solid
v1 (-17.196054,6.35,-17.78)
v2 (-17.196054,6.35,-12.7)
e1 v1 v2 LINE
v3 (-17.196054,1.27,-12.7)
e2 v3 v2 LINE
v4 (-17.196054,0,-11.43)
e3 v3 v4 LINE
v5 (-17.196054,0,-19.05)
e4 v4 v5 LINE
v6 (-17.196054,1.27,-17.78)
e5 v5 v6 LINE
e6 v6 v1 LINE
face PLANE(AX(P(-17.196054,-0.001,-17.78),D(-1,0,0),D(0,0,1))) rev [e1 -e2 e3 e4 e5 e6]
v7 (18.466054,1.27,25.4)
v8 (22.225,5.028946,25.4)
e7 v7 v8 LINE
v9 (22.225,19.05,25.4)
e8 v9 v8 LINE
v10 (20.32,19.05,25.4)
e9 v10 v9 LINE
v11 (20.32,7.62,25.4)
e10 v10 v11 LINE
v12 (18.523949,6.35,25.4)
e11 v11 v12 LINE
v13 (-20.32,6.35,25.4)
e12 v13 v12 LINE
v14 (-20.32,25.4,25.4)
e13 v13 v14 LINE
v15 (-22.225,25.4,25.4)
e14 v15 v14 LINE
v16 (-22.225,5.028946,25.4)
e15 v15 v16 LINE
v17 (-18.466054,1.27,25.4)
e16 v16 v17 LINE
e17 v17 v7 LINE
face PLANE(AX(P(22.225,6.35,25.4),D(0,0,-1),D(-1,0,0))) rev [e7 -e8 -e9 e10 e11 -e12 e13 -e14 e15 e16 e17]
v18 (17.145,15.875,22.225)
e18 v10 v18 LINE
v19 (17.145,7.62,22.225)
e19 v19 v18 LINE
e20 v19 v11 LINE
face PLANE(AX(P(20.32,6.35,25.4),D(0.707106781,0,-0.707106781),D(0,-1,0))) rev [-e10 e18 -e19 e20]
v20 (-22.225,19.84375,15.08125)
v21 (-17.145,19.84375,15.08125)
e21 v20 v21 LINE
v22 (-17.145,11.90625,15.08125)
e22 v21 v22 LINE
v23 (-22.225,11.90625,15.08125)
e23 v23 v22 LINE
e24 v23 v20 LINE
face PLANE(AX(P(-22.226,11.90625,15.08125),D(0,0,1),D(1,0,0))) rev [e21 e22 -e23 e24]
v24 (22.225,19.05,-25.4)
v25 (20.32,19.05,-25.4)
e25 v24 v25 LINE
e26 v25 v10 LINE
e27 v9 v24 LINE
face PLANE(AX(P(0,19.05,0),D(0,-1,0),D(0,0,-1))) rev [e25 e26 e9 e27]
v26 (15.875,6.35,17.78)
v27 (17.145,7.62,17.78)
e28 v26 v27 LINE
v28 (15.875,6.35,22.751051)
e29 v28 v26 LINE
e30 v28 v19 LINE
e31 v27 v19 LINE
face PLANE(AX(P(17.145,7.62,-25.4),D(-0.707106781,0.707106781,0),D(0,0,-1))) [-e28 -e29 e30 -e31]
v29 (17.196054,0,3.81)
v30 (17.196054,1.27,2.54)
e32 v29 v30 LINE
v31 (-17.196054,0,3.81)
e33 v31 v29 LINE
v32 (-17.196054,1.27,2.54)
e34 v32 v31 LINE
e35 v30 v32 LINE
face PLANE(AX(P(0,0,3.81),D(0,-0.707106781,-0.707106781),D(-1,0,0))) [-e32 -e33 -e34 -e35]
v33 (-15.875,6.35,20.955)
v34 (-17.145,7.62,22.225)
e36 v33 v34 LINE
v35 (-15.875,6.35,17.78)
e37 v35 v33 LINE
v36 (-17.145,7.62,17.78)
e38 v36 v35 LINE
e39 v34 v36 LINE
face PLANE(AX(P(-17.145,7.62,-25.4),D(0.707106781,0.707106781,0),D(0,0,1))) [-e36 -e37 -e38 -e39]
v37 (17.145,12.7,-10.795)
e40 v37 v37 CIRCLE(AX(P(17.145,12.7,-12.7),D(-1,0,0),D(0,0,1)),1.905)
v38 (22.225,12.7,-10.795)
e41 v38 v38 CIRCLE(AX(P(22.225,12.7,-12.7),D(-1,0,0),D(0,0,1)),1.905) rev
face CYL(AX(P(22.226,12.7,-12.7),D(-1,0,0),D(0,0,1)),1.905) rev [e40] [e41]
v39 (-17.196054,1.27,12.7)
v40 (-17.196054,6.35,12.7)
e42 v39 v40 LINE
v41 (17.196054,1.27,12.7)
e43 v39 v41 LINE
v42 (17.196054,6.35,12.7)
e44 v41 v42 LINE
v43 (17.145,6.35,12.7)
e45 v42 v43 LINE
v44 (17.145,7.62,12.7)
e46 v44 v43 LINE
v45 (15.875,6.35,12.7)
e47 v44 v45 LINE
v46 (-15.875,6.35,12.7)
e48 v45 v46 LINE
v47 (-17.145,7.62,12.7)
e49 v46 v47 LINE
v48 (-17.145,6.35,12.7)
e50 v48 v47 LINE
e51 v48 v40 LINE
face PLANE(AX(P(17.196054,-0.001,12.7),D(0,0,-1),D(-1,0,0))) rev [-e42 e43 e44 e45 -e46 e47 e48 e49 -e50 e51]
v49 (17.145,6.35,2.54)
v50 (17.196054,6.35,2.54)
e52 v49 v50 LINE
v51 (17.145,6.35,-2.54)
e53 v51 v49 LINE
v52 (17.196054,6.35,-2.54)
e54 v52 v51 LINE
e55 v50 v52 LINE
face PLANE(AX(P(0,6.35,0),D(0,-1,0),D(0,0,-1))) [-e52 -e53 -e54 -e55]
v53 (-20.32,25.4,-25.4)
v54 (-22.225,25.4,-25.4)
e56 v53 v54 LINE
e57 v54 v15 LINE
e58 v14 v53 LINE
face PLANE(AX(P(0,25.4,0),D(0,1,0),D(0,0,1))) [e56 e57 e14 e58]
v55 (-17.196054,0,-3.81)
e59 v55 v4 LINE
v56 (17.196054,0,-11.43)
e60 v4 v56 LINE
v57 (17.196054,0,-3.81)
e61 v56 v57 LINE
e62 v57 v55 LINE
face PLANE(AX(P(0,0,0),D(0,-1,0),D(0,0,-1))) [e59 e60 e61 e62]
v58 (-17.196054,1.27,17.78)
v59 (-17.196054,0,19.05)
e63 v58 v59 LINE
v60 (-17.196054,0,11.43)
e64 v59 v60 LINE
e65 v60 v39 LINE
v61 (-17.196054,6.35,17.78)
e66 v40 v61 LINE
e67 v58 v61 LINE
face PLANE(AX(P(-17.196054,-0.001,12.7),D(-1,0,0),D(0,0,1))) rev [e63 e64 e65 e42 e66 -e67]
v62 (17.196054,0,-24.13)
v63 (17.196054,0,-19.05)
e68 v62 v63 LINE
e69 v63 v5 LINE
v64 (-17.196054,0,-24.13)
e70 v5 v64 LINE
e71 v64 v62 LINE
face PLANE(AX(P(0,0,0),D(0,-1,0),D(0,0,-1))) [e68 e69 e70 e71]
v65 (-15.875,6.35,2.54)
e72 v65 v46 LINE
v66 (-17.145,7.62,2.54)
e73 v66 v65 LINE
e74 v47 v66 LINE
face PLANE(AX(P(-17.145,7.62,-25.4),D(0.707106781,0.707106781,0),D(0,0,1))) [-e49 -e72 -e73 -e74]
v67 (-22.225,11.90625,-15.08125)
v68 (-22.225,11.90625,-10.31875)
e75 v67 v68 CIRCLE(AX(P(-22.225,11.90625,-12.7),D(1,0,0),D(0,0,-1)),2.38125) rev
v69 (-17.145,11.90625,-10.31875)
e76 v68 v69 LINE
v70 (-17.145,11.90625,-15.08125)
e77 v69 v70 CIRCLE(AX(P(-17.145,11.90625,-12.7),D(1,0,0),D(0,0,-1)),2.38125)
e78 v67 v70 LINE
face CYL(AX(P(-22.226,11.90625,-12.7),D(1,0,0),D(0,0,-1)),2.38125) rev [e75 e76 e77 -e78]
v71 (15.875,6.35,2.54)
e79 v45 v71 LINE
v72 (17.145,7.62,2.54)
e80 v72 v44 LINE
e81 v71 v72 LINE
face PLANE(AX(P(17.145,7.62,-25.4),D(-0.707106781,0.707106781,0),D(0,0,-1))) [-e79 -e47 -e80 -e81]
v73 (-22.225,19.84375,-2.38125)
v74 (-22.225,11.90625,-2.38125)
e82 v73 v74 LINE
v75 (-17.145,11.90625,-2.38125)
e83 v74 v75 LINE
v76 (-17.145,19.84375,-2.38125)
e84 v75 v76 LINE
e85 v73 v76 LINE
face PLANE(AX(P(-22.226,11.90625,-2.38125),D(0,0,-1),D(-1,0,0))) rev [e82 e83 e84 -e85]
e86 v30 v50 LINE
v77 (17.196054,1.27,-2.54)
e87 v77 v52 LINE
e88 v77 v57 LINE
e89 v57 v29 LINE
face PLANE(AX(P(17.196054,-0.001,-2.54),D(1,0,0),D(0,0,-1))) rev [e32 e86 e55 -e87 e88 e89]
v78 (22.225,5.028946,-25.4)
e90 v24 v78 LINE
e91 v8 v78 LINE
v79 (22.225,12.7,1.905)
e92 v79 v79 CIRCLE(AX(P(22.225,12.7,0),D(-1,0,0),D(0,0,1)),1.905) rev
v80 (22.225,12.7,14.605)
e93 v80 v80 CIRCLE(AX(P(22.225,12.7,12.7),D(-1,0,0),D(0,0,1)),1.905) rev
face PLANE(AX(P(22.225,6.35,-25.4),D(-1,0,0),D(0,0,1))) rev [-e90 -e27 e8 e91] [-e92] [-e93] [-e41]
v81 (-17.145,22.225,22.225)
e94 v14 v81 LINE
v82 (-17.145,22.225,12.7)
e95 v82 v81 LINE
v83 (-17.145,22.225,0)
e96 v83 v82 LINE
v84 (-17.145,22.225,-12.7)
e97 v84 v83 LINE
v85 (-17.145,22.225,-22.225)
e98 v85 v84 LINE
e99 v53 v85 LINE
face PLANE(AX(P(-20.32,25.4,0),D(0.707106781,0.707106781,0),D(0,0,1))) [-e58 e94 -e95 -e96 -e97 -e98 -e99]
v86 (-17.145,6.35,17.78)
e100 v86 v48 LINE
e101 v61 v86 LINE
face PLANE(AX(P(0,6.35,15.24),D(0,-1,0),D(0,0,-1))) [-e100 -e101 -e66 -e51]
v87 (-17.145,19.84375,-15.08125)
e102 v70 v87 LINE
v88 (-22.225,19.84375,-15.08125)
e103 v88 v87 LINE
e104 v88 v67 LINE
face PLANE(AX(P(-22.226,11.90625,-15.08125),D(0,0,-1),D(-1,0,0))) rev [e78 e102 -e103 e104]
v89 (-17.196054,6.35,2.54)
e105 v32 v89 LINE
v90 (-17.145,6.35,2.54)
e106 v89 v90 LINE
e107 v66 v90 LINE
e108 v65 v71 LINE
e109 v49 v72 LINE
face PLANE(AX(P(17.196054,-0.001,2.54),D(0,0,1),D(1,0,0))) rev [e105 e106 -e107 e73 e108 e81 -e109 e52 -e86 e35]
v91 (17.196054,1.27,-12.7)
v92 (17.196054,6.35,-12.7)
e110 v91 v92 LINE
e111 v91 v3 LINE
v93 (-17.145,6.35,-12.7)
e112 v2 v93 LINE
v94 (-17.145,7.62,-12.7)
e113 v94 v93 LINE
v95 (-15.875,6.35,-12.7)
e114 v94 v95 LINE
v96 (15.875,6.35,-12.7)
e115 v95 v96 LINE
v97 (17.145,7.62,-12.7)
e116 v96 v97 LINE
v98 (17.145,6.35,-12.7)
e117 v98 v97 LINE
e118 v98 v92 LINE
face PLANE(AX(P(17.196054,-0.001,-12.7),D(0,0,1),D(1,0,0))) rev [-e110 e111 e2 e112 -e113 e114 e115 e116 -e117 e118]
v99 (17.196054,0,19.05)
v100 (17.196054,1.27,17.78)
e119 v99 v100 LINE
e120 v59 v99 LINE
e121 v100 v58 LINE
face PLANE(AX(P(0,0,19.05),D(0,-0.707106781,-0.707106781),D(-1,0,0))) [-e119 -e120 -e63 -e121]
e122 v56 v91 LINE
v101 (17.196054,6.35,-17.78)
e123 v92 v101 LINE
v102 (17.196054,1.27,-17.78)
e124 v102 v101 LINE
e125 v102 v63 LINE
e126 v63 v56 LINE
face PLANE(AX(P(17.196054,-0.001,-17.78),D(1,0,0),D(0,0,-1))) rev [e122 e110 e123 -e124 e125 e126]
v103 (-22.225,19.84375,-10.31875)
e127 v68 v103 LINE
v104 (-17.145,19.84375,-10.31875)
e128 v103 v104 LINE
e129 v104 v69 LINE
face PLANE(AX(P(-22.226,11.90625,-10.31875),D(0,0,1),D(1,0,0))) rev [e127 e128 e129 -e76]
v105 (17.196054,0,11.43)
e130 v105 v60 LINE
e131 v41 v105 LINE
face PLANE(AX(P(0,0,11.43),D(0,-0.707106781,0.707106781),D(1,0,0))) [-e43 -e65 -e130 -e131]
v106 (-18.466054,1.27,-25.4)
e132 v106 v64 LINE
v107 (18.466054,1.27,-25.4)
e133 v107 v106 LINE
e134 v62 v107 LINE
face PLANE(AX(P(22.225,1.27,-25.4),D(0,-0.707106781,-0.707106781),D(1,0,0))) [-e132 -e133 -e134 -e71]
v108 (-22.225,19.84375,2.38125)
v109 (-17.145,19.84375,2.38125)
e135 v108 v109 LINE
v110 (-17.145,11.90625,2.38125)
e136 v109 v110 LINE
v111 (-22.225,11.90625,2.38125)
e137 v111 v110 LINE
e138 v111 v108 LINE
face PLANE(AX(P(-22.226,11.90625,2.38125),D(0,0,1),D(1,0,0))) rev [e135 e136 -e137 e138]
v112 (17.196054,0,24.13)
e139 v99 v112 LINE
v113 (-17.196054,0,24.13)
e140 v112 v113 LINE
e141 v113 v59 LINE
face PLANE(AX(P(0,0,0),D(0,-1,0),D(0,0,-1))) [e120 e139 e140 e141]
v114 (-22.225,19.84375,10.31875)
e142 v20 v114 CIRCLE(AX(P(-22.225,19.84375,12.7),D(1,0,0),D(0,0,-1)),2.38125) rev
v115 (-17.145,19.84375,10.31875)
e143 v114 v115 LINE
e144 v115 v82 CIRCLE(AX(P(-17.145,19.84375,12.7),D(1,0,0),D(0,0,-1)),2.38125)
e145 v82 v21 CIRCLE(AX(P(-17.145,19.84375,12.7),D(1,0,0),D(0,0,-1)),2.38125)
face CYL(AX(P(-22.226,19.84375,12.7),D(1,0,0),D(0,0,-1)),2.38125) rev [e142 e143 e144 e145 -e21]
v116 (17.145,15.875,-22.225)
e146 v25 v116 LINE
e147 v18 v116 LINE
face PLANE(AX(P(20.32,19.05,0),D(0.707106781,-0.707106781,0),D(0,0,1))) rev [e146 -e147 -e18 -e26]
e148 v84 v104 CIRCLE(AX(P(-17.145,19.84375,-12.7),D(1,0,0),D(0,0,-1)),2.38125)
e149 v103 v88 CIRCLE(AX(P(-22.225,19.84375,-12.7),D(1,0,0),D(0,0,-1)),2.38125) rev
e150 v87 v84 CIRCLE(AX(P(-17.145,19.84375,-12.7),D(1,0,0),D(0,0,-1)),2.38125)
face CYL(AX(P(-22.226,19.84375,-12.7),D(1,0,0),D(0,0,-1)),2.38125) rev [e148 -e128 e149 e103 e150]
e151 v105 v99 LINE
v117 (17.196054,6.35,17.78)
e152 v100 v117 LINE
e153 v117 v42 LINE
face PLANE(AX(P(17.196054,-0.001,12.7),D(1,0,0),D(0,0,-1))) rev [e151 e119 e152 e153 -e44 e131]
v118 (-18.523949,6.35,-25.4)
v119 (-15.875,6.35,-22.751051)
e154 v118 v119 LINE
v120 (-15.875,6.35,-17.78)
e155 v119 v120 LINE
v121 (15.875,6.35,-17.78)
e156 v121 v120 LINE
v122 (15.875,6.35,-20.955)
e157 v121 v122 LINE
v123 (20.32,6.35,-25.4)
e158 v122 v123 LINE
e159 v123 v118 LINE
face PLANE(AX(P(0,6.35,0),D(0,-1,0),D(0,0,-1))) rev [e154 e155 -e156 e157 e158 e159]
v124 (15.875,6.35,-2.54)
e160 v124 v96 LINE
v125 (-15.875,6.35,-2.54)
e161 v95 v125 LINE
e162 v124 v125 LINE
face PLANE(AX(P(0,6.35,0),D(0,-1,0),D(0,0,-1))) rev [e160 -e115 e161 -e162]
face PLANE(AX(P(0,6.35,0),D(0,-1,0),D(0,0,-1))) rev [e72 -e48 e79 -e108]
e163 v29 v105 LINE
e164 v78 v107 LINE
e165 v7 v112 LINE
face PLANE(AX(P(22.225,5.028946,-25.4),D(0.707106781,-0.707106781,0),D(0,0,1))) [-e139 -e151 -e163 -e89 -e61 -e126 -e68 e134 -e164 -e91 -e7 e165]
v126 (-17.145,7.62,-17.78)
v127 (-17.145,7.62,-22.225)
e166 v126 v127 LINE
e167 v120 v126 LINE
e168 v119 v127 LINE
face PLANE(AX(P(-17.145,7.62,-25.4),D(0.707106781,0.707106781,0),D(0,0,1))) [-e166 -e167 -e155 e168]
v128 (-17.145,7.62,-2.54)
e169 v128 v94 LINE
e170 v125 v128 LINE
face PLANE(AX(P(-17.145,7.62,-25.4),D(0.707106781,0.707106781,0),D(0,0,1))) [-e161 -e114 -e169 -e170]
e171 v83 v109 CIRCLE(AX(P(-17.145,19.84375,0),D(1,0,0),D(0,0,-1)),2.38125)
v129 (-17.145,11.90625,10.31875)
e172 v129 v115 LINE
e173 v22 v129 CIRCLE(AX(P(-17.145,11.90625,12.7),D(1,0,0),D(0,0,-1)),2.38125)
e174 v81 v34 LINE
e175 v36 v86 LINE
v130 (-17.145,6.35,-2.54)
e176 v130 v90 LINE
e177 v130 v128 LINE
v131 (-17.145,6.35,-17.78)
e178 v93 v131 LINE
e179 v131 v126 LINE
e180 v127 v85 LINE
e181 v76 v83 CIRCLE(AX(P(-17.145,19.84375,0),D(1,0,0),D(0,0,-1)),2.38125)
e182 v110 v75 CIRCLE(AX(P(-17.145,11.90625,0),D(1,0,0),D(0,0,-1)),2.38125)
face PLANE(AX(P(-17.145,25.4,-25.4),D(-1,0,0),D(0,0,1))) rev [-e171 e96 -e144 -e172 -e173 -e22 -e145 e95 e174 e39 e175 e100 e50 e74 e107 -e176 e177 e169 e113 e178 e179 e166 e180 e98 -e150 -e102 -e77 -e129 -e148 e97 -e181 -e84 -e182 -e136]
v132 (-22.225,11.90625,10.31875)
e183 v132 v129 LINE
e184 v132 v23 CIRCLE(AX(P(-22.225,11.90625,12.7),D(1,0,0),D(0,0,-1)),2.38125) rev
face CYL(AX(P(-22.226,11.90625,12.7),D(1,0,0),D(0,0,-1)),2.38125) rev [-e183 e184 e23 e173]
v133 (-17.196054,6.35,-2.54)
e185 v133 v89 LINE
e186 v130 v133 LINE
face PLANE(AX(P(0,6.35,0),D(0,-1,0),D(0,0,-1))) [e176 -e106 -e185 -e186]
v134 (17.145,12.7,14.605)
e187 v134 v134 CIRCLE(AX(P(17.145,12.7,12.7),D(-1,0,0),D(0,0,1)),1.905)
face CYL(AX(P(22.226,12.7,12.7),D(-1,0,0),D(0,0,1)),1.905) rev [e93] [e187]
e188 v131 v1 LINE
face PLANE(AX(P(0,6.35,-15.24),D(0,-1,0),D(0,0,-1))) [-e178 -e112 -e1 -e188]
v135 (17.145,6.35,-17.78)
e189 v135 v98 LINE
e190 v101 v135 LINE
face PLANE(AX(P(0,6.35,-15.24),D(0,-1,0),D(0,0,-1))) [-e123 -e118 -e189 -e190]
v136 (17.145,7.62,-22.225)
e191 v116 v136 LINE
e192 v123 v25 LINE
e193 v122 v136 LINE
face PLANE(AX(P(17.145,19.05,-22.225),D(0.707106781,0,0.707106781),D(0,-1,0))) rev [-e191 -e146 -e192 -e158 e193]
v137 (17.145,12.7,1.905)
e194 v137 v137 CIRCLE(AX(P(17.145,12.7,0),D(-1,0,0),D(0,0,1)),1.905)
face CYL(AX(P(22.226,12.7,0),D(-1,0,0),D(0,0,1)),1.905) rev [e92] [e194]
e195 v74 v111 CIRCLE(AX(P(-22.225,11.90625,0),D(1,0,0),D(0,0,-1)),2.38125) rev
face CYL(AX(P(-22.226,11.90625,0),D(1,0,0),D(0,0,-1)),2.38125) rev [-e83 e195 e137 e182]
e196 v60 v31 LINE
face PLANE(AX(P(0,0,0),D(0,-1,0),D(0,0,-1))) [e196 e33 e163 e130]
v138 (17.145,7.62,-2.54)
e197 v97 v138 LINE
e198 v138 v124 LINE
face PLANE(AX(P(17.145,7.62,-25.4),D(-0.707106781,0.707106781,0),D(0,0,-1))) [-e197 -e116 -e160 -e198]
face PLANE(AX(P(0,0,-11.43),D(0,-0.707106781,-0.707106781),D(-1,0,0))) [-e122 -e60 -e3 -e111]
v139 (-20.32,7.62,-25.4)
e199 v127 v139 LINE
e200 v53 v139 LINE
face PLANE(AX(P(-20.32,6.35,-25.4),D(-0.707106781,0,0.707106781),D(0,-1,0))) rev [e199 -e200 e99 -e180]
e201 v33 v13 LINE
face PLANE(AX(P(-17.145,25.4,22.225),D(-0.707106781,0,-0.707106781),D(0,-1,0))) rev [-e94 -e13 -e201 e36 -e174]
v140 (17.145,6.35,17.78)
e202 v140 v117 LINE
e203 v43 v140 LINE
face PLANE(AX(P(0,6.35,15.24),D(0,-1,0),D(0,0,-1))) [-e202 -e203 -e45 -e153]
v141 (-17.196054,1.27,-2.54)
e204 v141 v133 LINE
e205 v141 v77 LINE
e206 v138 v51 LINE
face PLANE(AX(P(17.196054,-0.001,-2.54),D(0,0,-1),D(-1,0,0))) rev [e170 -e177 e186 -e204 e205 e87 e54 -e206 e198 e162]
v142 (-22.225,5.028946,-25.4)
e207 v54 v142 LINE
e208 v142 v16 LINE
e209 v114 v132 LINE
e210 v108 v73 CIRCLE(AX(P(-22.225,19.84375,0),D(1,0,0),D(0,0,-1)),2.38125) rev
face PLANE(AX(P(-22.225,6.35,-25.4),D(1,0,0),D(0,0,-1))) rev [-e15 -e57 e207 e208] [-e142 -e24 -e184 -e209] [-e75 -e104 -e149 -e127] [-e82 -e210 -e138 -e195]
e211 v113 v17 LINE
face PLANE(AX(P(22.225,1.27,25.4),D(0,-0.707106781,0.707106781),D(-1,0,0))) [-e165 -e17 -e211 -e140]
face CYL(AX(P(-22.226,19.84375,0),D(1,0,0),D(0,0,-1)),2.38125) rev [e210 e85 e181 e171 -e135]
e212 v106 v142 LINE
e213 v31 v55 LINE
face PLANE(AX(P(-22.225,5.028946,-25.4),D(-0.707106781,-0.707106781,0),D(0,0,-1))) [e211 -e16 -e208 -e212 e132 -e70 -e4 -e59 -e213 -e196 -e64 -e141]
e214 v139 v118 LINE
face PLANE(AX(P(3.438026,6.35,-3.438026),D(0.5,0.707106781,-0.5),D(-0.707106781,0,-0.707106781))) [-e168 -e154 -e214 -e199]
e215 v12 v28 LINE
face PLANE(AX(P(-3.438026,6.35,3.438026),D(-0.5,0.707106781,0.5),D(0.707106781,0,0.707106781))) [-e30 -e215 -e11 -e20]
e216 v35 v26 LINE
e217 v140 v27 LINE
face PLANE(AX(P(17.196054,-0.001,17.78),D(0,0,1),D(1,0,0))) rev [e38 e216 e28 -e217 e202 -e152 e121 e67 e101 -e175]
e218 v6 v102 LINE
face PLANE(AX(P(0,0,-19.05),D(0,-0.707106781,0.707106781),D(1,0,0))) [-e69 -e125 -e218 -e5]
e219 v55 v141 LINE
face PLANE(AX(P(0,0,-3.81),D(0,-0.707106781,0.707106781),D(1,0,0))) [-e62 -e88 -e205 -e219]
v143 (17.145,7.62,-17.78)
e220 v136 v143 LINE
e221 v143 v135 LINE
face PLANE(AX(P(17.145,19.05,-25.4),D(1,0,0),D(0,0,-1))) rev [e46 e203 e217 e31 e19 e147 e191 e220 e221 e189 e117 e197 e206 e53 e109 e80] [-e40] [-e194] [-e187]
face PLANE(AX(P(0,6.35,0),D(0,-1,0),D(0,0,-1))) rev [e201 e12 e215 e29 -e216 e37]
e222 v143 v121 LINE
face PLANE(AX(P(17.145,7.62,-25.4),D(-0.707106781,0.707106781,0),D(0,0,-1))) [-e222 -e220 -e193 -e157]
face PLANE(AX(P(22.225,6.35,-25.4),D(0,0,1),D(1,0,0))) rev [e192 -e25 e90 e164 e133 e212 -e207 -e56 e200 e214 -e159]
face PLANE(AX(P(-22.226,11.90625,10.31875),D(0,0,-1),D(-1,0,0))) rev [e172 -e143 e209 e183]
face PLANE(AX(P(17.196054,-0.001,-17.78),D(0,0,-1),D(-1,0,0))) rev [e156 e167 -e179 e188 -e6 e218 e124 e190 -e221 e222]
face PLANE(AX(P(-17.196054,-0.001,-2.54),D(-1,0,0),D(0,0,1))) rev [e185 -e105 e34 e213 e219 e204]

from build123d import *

# Parameters (mm, degrees)
SKETCH1_W           = 44.45
SKETCH1_H           = 50.8
BOSS_EXTRUDE1_DEPTH = 6.35
SKETCH2_W           = 5.08
SKETCH2_H           = 50.8
BOSS_EXTRUDE2_DEPTH = 25.4
SKETCH3_W           = 5.08
SKETCH3_H           = 50.8
BOSS_EXTRUDE3_DEPTH = 19.05
CUT_EXTRUDE1_REACH  = 55.295
CUT_EXTRUDE2_REACH  = 55.295
SKETCH5_R           = 1.905
LPATTERN1_COUNT     = 2
LPATTERN1_PITCH     = 12.7
LPATTERN1_COL_COUNT = 2
LPATTERN1_COL_PITCH = 12.7
CHAMFER3_SIZE       = 5.028946
CHAMFER1_SIZE       = 3.175
CUT_EXTRUDE3_REACH  = 40.756
SKETCH6_W           = 34.392108
SKETCH6_H           = 5.08
LPATTERN2_COUNT     = 2
LPATTERN2_PITCH     = 15.24
LPATTERN2_COL_COUNT = 2
LPATTERN2_COL_PITCH = 15.24
CHAMFER4_SIZE       = 1.27


with BuildPart() as part:
    # Sketch1 → Boss-Extrude1 (new body)
    with BuildSketch(Plane(origin=(0, 0, 0), x_dir=(1, 0, 0), z_dir=(0, 1, 0))):
        Rectangle(SKETCH1_W, SKETCH1_H)
    extrude(amount=BOSS_EXTRUDE1_DEPTH)

    # Sketch2 → Boss-Extrude2 (add)
    with BuildSketch(Plane(origin=(0, 0, 0), x_dir=(1, 0, 0), z_dir=(0, 1, 0))):
        with Locations((-19.685, 0)):
            Rectangle(SKETCH2_W, SKETCH2_H)
    extrude(amount=BOSS_EXTRUDE2_DEPTH)

    # Sketch3 → Boss-Extrude3 (add)
    with BuildSketch(Plane(origin=(0, 0, 0), x_dir=(1, 0, 0), z_dir=(0, 1, 0))):
        with Locations((19.685, 0)):
            Rectangle(SKETCH3_W, SKETCH3_H)
    extrude(amount=BOSS_EXTRUDE3_DEPTH)

    # Sketch4 → Cut-Extrude1 (cut, up to next)
    with BuildSketch(Plane(origin=(-17.145, 0, 0), x_dir=(0, 0, -1), z_dir=(1, 0, 0)), mode=Mode.PRIVATE) as cut_extrude1_sk1:
        with BuildLine():
            Line((-2.38125, 11.90625), (-2.38125, 19.84375))
            ThreePointArc((-2.38125, 19.84375), (0, 22.225), (2.38125, 19.84375))
            Line((2.38125, 19.84375), (2.38125, 11.90625))
            ThreePointArc((2.38125, 11.90625), (0, 9.525), (-2.38125, 11.90625))
        make_face()
    cut_extrude1_tool1 = extrude(cut_extrude1_sk1.sketch, amount=-CUT_EXTRUDE1_REACH, mode=Mode.PRIVATE) & part.part
    cut_extrude1 = cut_extrude1_tool1.solids().sort_by_distance((-17.145, 15.875, 0))[0]
    add(cut_extrude1, mode=Mode.SUBTRACT)

    # Sketch5 → Cut-Extrude2 (cut, up to next)
    with BuildSketch(Plane.ZY.offset(-17.145), mode=Mode.PRIVATE) as cut_extrude2_sk1:
        with Locations((0, 12.7)):
            Circle(SKETCH5_R)
    cut_extrude2_tool1 = extrude(cut_extrude2_sk1.sketch, amount=-CUT_EXTRUDE2_REACH, mode=Mode.PRIVATE) & part.part
    cut_extrude2 = cut_extrude2_tool1.solids().sort_by_distance((17.145, 12.7, 0))[0]
    add(cut_extrude2, mode=Mode.SUBTRACT)

    # LPattern1: Cut-Extrude1, Cut-Extrude2 ×2
    with Locations(*[(0, 0, i * LPATTERN1_PITCH) for i in range(1, LPATTERN1_COUNT)]):
        add(cut_extrude1, mode=Mode.SUBTRACT)
        add(cut_extrude2, mode=Mode.SUBTRACT)

    # LPattern1 col: Cut-Extrude1, Cut-Extrude2 ×2
    with Locations(*[(0, 0, -i * LPATTERN1_COL_PITCH) for i in range(1, LPATTERN1_COL_COUNT)]):
        add(cut_extrude1, mode=Mode.SUBTRACT)
        add(cut_extrude2, mode=Mode.SUBTRACT)

    # Chamfer3
    chamfer3_edges = [part.edges().sort_by_distance(p)[0] for p in [
        (22.225, 0, 0),
        (-22.225, 0, 0),
    ]]
    chamfer(chamfer3_edges, length=CHAMFER3_SIZE)

    # Chamfer1
    chamfer1_edges = [part.edges().sort_by_distance(p)[0] for p in [
        (-17.145, 15.875, 25.4),
        (-17.145, 15.875, -25.4),
        (-17.145, 25.4, 0),
        (17.145, 12.7, -25.4),
        (17.145, 12.7, 25.4),
        (17.145, 19.05, 0),
    ]]
    chamfer(chamfer1_edges, length=CHAMFER1_SIZE - 0.0001)  # a hair under: the kernel refuses the full size

    # Sketch6 → Cut-Extrude3 (cut, up to next)
    with BuildSketch(Plane(origin=(0, 6.35, 0), x_dir=(1, 0, 0), z_dir=(0, 1, 0)), mode=Mode.PRIVATE) as cut_extrude3_sk1:
        Rectangle(SKETCH6_W, SKETCH6_H)
    cut_extrude3_tool1 = extrude(cut_extrude3_sk1.sketch, amount=-CUT_EXTRUDE3_REACH, mode=Mode.PRIVATE) & part.part
    cut_extrude3 = cut_extrude3_tool1.solids().sort_by_distance((0, 6.35, 0))[0]
    add(cut_extrude3, mode=Mode.SUBTRACT)

    # LPattern2: Cut-Extrude3 ×2
    with Locations(*[(0, 0, i * LPATTERN2_PITCH) for i in range(1, LPATTERN2_COUNT)]):
        add(cut_extrude3, mode=Mode.SUBTRACT)

    # LPattern2 col: Cut-Extrude3 ×2
    with Locations(*[(0, 0, -i * LPATTERN2_COL_PITCH) for i in range(1, LPATTERN2_COL_COUNT)]):
        add(cut_extrude3, mode=Mode.SUBTRACT)

    # Chamfer4
    chamfer4_edges = [part.edges().sort_by_distance(p)[0] for p in [
        (0, 0, 25.4),
        (0, 0, -25.4),
        (17.145, 6.35, -20.00255),
        (-17.145, 6.35, 20.00255),
        (18.73245, 6.35, 23.81255),
        (-18.73245, 6.35, -23.81255),
        (17.145, 6.35, 7.62),
        (-17.145, 6.35, -7.62),
        (0, 0, 2.54),
        (0, 0, -2.54),
        (17.145, 6.35, -7.62),
        (-17.145, 6.35, -20.00255),
        (0, 0, -12.7),
        (0, 0, -17.78),
        (17.145, 6.35, 20.00255),
        (-17.145, 6.35, 7.62),
        (0, 0, 17.78),
        (0, 0, 12.7),
    ]]
    chamfer(chamfer4_edges, length=CHAMFER4_SIZE)


solid = part.part
